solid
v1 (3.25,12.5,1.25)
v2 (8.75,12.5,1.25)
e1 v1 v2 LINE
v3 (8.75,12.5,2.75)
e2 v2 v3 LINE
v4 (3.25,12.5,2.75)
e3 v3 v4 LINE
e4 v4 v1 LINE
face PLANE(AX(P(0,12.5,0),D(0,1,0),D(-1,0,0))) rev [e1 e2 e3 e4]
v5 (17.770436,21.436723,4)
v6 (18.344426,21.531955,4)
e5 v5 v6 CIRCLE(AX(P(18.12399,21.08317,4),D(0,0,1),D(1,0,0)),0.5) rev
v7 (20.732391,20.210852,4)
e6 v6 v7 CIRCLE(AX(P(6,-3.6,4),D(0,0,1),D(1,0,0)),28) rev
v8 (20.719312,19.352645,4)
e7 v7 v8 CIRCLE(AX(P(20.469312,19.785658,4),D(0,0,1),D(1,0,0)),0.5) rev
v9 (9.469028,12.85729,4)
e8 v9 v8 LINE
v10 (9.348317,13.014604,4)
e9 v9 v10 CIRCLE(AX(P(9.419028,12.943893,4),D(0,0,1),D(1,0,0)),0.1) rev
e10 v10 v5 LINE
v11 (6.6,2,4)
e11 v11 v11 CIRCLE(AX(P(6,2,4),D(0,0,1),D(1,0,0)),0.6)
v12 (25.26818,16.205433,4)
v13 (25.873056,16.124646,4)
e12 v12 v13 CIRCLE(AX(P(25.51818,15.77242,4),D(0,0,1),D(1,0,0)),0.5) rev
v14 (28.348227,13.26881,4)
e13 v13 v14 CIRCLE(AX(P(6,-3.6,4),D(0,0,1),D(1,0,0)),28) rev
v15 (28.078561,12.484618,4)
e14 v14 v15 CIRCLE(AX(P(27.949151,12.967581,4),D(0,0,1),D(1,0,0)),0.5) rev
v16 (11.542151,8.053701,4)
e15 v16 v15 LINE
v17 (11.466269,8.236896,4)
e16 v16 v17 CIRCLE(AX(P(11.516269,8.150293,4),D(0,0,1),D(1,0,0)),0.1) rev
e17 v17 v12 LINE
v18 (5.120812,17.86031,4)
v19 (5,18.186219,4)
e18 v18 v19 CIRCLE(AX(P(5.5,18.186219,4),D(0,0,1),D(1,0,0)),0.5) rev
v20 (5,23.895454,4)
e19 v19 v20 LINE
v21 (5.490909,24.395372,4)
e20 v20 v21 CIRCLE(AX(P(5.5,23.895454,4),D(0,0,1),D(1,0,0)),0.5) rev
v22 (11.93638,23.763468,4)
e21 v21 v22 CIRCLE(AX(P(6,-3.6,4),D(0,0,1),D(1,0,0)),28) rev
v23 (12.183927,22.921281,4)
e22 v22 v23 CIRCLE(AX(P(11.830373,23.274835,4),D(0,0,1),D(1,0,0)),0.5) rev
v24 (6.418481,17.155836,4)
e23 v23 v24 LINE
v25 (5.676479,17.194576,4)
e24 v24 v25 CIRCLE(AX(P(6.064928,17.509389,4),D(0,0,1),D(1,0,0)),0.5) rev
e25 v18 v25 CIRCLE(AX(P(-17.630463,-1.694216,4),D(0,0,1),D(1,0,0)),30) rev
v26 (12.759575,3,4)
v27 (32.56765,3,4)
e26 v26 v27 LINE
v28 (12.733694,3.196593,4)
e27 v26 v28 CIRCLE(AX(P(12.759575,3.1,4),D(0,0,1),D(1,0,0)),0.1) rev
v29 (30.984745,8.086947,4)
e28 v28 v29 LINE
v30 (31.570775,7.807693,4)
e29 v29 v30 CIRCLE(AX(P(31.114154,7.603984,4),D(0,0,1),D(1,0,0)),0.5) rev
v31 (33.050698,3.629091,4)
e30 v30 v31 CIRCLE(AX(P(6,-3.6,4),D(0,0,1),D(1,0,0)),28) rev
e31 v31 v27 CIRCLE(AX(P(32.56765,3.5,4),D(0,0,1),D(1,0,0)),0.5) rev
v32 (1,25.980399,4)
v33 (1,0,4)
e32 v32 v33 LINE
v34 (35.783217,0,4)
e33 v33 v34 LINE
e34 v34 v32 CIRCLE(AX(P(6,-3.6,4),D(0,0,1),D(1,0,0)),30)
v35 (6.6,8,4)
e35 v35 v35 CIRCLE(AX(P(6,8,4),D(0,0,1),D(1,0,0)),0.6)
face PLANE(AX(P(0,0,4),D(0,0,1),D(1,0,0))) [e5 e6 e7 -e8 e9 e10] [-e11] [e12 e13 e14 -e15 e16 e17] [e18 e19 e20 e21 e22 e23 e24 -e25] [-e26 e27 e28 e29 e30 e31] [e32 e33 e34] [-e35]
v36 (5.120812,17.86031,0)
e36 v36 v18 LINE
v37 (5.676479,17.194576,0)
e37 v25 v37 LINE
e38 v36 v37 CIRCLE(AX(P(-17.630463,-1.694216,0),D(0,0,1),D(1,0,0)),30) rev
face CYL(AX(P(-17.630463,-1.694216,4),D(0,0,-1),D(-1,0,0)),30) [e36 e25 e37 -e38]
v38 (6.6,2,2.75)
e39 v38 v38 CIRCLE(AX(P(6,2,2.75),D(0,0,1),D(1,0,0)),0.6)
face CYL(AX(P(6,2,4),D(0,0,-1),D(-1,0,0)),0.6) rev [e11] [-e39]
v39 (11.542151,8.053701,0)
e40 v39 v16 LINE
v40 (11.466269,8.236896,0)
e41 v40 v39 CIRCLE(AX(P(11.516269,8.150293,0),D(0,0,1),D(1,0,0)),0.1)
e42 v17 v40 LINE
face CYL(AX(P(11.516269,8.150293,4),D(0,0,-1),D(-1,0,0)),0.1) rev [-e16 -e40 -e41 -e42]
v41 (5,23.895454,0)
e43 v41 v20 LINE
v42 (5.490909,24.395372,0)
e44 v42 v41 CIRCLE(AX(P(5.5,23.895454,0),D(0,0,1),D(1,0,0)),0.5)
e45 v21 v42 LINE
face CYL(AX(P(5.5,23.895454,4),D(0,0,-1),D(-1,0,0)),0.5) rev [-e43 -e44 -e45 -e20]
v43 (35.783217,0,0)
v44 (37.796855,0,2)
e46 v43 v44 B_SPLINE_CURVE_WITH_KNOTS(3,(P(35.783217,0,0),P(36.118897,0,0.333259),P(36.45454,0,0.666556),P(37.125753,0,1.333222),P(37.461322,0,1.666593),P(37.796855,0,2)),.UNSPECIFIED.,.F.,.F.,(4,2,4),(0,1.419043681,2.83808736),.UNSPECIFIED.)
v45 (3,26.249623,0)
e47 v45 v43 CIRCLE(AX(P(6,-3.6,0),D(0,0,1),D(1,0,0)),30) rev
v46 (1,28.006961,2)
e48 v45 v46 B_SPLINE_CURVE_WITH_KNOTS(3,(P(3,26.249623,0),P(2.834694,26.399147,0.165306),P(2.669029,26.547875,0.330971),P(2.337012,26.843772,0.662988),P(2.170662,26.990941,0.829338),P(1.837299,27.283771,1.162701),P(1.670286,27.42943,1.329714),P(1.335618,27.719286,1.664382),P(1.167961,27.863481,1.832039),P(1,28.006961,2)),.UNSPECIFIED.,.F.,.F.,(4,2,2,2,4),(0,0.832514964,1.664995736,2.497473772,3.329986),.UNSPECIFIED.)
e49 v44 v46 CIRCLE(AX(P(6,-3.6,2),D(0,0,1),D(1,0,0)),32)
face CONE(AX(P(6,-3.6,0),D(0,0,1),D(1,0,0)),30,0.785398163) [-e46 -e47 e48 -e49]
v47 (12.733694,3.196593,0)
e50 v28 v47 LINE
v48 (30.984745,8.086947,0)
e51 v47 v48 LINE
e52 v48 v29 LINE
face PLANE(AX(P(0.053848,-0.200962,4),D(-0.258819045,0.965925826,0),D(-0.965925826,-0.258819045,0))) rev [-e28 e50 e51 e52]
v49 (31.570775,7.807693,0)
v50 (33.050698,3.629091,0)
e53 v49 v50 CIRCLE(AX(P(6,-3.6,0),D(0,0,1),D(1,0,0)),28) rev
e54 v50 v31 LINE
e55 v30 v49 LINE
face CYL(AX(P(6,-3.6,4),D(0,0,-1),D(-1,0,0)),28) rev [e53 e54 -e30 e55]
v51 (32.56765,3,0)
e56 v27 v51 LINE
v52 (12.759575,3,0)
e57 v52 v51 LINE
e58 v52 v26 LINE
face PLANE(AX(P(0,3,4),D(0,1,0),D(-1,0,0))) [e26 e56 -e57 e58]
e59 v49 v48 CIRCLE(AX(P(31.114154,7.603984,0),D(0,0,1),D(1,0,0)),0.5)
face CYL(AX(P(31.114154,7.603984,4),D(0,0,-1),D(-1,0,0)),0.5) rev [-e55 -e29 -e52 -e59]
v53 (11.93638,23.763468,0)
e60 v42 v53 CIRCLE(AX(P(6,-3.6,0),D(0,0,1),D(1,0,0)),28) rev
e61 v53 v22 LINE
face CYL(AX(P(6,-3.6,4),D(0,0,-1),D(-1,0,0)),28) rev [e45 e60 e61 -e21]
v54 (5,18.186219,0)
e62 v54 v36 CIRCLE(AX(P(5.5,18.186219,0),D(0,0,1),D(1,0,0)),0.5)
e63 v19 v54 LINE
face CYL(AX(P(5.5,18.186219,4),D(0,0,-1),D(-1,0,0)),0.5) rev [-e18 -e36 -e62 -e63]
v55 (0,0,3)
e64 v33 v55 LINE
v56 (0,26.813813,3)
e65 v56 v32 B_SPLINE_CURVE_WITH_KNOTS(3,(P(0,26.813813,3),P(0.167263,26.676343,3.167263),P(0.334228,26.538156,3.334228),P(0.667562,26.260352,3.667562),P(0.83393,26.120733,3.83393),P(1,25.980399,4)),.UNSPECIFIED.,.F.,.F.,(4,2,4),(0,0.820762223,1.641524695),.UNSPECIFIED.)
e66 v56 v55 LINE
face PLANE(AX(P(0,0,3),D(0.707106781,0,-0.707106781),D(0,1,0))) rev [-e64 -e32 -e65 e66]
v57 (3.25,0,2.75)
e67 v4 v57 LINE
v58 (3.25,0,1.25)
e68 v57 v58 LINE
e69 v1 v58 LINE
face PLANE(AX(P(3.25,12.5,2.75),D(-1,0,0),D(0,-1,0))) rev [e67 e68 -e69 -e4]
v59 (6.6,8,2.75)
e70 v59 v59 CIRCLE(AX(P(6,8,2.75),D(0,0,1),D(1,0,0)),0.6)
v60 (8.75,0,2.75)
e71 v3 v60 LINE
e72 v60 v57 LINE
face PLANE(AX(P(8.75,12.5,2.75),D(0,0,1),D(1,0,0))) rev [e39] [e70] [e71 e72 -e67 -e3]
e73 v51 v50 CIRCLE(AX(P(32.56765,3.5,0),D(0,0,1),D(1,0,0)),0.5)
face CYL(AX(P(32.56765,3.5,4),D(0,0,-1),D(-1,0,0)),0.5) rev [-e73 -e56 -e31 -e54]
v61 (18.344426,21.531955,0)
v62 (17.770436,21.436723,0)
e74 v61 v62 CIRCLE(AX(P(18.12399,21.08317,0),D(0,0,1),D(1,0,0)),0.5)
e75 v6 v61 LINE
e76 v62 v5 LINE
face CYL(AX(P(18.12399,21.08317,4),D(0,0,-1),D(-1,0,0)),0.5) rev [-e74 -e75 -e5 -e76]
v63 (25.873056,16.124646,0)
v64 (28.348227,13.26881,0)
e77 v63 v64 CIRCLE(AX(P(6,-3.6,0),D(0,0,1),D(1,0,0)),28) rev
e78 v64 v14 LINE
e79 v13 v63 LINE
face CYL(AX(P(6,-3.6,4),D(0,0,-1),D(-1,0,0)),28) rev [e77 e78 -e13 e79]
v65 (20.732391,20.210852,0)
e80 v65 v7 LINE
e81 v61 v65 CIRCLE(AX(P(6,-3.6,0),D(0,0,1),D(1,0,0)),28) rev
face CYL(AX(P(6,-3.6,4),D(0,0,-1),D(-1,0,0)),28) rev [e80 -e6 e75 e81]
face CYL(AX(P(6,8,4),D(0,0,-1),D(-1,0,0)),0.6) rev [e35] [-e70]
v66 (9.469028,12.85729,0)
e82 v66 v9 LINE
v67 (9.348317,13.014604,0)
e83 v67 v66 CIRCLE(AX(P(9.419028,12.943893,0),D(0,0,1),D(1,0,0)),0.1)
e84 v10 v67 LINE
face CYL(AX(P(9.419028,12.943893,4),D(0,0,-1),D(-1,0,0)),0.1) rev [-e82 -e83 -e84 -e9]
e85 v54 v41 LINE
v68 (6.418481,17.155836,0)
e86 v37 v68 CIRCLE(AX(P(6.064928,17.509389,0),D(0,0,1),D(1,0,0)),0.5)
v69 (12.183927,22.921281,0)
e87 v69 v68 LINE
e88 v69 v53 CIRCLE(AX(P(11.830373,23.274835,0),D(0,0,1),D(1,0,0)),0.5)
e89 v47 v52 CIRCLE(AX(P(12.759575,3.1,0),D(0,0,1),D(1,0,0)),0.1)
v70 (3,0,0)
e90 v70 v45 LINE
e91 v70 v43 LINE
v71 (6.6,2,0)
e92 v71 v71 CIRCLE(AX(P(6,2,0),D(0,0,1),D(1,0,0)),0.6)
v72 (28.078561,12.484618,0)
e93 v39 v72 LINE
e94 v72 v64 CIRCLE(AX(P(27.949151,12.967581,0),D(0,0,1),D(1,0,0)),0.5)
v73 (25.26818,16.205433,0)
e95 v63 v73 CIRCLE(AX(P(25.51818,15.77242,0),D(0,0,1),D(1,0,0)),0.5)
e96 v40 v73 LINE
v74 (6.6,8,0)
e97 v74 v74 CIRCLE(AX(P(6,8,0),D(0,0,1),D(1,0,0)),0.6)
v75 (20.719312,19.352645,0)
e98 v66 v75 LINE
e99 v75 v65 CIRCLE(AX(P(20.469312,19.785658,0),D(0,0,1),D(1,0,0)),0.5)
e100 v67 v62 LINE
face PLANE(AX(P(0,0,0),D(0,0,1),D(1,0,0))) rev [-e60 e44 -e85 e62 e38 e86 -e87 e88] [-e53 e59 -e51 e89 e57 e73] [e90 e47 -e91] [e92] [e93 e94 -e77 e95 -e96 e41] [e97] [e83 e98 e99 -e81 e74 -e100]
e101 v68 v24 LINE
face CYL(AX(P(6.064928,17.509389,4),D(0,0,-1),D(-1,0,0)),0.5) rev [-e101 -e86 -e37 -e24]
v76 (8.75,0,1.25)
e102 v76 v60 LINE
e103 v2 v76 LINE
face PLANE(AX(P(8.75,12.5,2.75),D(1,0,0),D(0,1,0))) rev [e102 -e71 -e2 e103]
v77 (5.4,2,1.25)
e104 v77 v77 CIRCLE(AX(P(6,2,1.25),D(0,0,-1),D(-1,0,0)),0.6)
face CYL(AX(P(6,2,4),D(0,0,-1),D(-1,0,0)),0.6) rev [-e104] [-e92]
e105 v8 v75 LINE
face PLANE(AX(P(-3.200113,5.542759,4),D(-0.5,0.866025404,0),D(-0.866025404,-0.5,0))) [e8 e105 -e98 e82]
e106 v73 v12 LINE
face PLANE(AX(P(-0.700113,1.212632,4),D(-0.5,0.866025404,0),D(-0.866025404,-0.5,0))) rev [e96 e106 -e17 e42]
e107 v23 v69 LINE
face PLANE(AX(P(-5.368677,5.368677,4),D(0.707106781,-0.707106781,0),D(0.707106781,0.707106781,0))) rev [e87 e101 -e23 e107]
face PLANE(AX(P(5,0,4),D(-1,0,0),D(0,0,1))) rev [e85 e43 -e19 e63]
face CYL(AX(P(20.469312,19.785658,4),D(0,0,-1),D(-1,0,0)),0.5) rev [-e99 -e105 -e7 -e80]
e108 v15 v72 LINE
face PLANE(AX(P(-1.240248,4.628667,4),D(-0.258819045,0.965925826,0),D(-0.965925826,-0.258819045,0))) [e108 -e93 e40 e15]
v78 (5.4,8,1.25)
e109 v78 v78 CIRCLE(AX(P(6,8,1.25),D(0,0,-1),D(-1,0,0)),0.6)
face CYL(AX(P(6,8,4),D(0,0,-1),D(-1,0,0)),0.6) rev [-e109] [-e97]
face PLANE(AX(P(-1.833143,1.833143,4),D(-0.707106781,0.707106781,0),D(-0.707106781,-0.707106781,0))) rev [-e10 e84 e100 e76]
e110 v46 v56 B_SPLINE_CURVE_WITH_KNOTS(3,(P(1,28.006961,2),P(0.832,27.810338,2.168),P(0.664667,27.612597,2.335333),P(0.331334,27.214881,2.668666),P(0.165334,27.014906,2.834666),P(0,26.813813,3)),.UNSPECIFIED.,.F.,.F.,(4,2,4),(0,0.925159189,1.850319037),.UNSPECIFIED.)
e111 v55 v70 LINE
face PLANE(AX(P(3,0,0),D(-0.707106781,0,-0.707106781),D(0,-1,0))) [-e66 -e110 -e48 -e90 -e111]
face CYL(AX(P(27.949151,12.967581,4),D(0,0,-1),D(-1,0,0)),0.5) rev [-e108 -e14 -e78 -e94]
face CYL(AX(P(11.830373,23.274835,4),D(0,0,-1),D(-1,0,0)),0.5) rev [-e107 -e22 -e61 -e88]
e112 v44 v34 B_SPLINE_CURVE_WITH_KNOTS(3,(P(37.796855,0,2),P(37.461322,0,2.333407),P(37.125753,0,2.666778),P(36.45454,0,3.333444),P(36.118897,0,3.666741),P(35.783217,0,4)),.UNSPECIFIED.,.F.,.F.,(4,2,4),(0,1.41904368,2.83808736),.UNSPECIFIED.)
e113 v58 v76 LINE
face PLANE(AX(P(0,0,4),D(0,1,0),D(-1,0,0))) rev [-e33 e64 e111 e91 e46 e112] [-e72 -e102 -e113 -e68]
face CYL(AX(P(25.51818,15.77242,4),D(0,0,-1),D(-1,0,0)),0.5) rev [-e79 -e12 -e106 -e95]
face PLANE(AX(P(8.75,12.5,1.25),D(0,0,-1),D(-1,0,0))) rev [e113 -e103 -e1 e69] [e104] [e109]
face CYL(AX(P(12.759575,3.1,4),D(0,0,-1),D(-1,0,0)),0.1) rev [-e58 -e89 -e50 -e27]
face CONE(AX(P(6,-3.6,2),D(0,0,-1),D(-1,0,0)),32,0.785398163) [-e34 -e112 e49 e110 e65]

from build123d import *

# Parameters (mm, degrees)
SKETCH1_R           = 0.6
BOSS_EXTRUDE1_DEPTH = 4
FILLET3_R           = 0.1
FILLET4_R           = 0.5
SKETCH6_W           = 5.5
SKETCH6_H           = 1.5
CUT_EXTRUDE3_DEPTH  = 12.5
CHAMFER5_SIZE       = 2
CHAMFER6_SIZE       = 2
CHAMFER7_SIZE       = 3
CHAMFER8_SIZE       = 1


with BuildPart() as part:
    # Sketch1 → Boss-Extrude1 (new body)
    with BuildSketch(Plane.XY):
        with BuildLine():
            Line((0, 27.832467291), (0, 0))
            Line((0, 0), (37.79685519, 0))
            ThreePointArc((37.79685519, 0), (24.974482689, 22.16759606), (0, 27.832467291))
        make_face()
        with Locations((6, 2)):
            Circle(SKETCH1_R, mode=Mode.SUBTRACT)
        with Locations((6, 8)):
            Circle(SKETCH1_R, mode=Mode.SUBTRACT)
        with BuildLine():
            Line((33.211027176, 3), (12, 3))
            Line((12, 3), (31.393734472, 8.19653549))
            ThreePointArc((31.393734472, 8.19653549), (32.430403559, 5.643038878), (33.211027176, 3))
        make_face(mode=Mode.SUBTRACT)
        with BuildLine():
            Line((28.785067971, 12.67392631), (10.80845767, 7.857108097))
            Line((10.80845767, 7.857108097), (25.599351889, 16.396634856))
            ThreePointArc((25.599351889, 16.396634856), (27.273796122, 14.605098147), (28.785067971, 12.67392631))
        make_face(mode=Mode.SUBTRACT)
        with BuildLine():
            ThreePointArc((6.022317364, 16.759671956), (5.519466967, 17.386683928), (5, 18))
            Line((5, 18), (5, 24.382137159))
            ThreePointArc((5, 24.382137159), (8.938861294, 24.245342416), (12.819495121, 23.556849712))
            Line((12.819495121, 23.556849712), (6.022317364, 16.759671956))
        make_face(mode=Mode.SUBTRACT)
        with BuildLine():
            ThreePointArc((18.021652475, 21.687939255), (19.760252022, 20.785558519), (21.431506729, 19.763831023))
            Line((21.431506729, 19.763831023), (8.811215985, 12.477502764))
            Line((8.811215985, 12.477502764), (18.021652475, 21.687939255))
        make_face(mode=Mode.SUBTRACT)
    extrude(amount=BOSS_EXTRUDE1_DEPTH)

    # Fillet3
    fillet3_edges = [part.edges().sort_by_distance(p)[0] for p in [
        (12, 3, 2),
        (10.80845767, 7.857108097, 2),
        (8.811215985, 12.477502764, 2),
    ]]
    fillet(fillet3_edges, radius=FILLET3_R)

    # Fillet4
    fillet4_edges = [part.edges().sort_by_distance(p)[0] for p in [
        (6.022317364, 16.759671956, 2),
        (12.819495121, 23.556849712, 2),
        (5, 24.382137159, 2),
        (5, 18, 2),
        (33.211027176, 3, 2),
        (31.393734472, 8.19653549, 2),
        (28.785067971, 12.67392631, 2),
        (25.599351889, 16.396634856, 2),
        (21.431506729, 19.763831023, 2),
        (18.021652475, 21.687939255, 2),
    ]]
    fillet(fillet4_edges, radius=FILLET4_R)

    # Sketch6 → Cut-Extrude3 (cut)
    with BuildSketch(Plane.XZ):
        with Locations((6, 2)):
            Rectangle(SKETCH6_W, SKETCH6_H)
    extrude(amount=-CUT_EXTRUDE3_DEPTH, mode=Mode.SUBTRACT)

    # Chamfer5
    chamfer5_edges = [part.edges().sort_by_distance(p)[0] for p in [
        (24.974482689, 22.16759606, 0),
    ]]
    chamfer(chamfer5_edges, length=CHAMFER5_SIZE)

    # Chamfer6
    chamfer6_edges = [part.edges().sort_by_distance(p)[0] for p in [
        (24.974482689, 22.16759606, 4),
    ]]
    chamfer(chamfer6_edges, length=CHAMFER6_SIZE - 0.0001)  # a hair under: the kernel refuses the full size

    # Chamfer7
    chamfer7_edges = [part.edges().sort_by_distance(p)[0] for p in [
        (0, 12.896938457, 0),
    ]]
    chamfer(chamfer7_edges, length=CHAMFER7_SIZE)

    # Chamfer8
    chamfer8_edges = [part.edges().sort_by_distance(p)[0] for p in [
        (0, 12.896989488, 4),
    ]]
    chamfer(chamfer8_edges, length=CHAMFER8_SIZE - 0.0001)  # a hair under: the kernel refuses the full size


solid = part.part
